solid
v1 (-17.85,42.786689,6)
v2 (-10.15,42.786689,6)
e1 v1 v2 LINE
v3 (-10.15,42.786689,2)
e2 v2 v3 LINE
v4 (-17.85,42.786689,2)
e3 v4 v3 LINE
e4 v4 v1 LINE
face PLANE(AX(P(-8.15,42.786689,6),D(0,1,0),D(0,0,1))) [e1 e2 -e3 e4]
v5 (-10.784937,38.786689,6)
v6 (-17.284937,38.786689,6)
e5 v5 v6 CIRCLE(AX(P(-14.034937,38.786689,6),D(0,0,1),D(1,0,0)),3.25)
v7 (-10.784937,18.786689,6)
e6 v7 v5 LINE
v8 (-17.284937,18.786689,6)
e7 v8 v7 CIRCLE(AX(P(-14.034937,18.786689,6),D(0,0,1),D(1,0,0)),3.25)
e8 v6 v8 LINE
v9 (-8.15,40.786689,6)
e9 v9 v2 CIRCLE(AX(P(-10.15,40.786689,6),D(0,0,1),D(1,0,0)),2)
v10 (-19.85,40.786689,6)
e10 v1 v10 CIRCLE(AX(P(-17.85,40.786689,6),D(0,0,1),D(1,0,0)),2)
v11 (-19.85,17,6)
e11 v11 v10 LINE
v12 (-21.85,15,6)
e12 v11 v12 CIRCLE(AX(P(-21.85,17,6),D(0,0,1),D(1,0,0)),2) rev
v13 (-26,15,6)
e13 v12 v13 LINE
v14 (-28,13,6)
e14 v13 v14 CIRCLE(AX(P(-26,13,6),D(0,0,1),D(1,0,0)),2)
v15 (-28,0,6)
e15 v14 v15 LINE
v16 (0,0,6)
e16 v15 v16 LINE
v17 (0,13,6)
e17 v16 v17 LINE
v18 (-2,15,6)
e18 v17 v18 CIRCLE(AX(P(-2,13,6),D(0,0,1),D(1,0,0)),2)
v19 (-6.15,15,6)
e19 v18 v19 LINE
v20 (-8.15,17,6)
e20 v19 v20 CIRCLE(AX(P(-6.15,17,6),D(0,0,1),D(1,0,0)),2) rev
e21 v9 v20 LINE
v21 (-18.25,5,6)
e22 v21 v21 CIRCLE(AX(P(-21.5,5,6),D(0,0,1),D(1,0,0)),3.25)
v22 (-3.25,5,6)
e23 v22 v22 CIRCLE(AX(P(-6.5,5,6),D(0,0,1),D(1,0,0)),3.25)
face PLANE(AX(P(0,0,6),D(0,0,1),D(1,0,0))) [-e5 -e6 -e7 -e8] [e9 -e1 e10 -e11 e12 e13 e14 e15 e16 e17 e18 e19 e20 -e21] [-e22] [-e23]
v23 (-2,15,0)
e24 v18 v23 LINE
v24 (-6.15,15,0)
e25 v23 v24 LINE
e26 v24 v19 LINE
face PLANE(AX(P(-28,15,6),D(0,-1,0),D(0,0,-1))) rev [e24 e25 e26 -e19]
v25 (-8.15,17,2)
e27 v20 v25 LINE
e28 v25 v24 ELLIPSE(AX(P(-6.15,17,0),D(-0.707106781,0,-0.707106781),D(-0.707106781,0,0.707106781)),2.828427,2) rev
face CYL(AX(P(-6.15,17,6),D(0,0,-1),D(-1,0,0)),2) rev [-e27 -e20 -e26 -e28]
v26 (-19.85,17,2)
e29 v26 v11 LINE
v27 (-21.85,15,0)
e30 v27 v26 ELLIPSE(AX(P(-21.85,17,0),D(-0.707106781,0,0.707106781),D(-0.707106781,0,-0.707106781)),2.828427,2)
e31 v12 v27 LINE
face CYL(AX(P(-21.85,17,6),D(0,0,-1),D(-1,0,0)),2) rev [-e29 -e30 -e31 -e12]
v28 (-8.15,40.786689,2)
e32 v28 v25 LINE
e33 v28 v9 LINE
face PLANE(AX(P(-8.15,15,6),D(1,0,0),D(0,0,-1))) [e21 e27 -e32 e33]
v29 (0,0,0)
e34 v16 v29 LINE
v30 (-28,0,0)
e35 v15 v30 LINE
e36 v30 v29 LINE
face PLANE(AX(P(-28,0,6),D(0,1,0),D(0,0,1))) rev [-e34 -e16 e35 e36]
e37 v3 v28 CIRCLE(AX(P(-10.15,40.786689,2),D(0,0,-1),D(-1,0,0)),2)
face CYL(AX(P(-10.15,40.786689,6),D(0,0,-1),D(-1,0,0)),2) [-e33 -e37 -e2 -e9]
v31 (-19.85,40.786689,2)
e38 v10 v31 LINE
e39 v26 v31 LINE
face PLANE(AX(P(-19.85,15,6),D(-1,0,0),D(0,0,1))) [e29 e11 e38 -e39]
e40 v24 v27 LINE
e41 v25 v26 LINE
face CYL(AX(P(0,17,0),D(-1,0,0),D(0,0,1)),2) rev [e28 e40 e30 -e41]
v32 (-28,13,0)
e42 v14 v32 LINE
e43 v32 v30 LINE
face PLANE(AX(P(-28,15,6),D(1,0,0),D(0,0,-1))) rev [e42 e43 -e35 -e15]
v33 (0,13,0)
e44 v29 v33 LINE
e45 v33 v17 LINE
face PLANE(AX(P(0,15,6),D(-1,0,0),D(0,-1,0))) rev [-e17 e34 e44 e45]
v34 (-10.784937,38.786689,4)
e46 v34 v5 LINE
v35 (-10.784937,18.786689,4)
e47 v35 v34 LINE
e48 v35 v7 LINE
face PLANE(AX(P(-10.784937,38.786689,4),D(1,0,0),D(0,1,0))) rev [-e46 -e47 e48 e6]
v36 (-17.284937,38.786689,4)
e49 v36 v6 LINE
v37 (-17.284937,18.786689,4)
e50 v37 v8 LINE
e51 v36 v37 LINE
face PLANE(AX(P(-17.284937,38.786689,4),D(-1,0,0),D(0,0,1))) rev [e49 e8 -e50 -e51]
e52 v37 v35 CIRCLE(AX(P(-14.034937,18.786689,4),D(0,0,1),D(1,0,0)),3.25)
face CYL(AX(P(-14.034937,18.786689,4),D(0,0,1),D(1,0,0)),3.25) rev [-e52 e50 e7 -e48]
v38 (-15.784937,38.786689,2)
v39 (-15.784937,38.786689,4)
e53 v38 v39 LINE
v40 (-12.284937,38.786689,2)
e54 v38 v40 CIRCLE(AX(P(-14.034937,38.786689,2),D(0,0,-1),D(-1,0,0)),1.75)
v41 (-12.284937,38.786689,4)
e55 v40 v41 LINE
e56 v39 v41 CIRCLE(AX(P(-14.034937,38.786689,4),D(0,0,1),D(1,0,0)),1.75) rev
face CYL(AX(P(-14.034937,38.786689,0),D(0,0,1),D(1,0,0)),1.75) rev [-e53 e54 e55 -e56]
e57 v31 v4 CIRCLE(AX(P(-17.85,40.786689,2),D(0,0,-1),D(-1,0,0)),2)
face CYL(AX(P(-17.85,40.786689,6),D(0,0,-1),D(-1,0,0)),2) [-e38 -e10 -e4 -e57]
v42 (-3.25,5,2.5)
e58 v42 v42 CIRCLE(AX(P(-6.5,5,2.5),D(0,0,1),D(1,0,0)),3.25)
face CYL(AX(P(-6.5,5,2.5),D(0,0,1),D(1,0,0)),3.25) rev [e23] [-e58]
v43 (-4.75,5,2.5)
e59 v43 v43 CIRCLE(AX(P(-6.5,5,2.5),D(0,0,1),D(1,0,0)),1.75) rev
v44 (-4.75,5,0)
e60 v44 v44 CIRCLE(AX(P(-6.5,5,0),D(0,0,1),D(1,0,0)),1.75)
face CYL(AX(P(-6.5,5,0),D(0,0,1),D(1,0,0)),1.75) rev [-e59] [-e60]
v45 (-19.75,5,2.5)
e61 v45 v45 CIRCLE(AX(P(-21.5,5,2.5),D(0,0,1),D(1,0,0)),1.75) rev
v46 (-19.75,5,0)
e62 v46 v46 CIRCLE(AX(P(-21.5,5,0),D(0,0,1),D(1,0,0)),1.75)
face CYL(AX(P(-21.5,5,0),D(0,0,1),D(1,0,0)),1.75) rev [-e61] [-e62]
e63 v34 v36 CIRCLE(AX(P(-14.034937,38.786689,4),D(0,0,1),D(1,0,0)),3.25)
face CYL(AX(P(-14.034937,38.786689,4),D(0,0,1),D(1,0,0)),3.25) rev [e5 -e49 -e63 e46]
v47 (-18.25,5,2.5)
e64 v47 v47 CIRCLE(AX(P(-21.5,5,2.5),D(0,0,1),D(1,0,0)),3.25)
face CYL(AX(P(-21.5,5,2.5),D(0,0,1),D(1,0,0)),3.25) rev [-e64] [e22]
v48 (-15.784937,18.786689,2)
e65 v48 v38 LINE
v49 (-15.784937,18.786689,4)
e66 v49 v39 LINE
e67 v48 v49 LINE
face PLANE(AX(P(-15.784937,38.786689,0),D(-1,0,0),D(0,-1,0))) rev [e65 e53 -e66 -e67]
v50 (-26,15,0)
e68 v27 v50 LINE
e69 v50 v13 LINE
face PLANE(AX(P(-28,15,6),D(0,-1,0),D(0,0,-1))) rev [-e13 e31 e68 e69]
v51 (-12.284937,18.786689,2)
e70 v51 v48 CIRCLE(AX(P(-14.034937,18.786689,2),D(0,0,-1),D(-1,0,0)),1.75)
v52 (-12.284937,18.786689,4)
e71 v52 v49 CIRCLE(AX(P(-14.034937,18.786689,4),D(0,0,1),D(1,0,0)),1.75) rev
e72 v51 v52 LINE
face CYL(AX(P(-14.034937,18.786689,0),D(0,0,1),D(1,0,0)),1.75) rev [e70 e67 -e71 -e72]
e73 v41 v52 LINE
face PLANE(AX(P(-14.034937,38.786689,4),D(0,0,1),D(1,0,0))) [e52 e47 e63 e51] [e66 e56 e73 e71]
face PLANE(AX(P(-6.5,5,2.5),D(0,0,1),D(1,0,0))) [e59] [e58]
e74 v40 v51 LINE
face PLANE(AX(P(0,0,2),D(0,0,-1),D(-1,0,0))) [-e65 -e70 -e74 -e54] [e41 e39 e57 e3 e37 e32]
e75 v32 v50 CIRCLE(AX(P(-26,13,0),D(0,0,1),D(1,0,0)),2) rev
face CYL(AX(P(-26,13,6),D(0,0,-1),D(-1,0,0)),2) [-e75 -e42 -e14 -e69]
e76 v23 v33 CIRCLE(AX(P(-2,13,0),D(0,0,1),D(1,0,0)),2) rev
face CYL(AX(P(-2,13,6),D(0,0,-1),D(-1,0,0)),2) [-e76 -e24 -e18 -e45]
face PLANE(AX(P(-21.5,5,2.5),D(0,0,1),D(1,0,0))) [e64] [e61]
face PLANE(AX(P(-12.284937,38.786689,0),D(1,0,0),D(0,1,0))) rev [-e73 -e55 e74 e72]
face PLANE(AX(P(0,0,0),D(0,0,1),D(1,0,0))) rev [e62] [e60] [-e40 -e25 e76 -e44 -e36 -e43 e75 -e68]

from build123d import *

# Parameters (mm, degrees)
BOSS_EXTRUDE1_DEPTH     = 6
CUT_EXTRUDE1_DEPTH      = 33.32645975048922
CUT_EXTRUDE1_DEPTH_BACK = 33.32645975048922
SKETCH3_R               = 1.7500000000000002
SKETCH3_R_2             = 1.7499999999999998
SKETCH6_R               = 3.2500000000000004
SKETCH6_R_2             = 3.25
CUT_EXTRUDE2_DEPTH      = 3.5
SKETCH7_W               = 11.699999999999998
SKETCH7_H               = 27.786688839798195
BOSS_EXTRUDE2_DEPTH     = 6
SKETCH8_W               = 11.699999999999998
SKETCH8_H               = 27.786688839798195
CUT_EXTRUDE3_DEPTH      = 2
FILLET1_R               = 2
FILLET2_R               = 2
FILLET3_R               = 2
CUT_EXTRUDE4_DEPTH      = 52.48495646180262
CUT_EXTRUDE4_DEPTH_BACK = 52.48495646180262
CUT_EXTRUDE5_DEPTH      = 52.48495646180262
CUT_EXTRUDE5_DEPTH_BACK = 2
FILLET4_R               = 2
FILLET5_R               = 2


with BuildPart() as part:
    # Sketch2 → Boss-Extrude1 (new body)
    with BuildSketch(Plane.XY):
        Polygon((-27.999999999999996, 15), (1.84e-15, 15), (0, 0), (-27.999999999999996, 0), align=None)
    extrude(amount=BOSS_EXTRUDE1_DEPTH)

    # Sketch3 → Cut-Extrude1 (cut, two sides: drawn at the far end of the back side and taken through both)
    with BuildSketch(Plane.XY.offset(6).offset(-CUT_EXTRUDE1_DEPTH_BACK)):
        with Locations((-21.5, 4.999999999999999)):
            Circle(SKETCH3_R)
        with Locations((-6.5, 4.999999999999999)):
            Circle(SKETCH3_R_2)
    extrude(amount=CUT_EXTRUDE1_DEPTH + CUT_EXTRUDE1_DEPTH_BACK, mode=Mode.SUBTRACT)

    # Sketch6 → Cut-Extrude2 (cut)
    with BuildSketch(Plane.XY.offset(6)):
        with Locations((-21.5, 4.999999999999999)):
            Circle(SKETCH6_R)
        with Locations((-6.500000000000001, 4.999999999999999)):
            Circle(SKETCH6_R_2)
    extrude(amount=-CUT_EXTRUDE2_DEPTH, mode=Mode.SUBTRACT)

    # Sketch7 → Boss-Extrude2 (add)
    with BuildSketch(Plane(origin=(0, 0, 0), x_dir=(-1, 0, 0), z_dir=(0, 0, -1))):
        with Locations((14, 28.893344419899098)):
            Rectangle(SKETCH7_W, SKETCH7_H)
    extrude(amount=-BOSS_EXTRUDE2_DEPTH)

    # Sketch8 → Cut-Extrude3 (cut)
    with BuildSketch(Plane(origin=(0, 0, 0), x_dir=(-1, 0, 0), z_dir=(0, 0, -1))):
        with Locations((14, 28.893344419899098)):
            Rectangle(SKETCH8_W, SKETCH8_H)
    extrude(amount=-CUT_EXTRUDE3_DEPTH, mode=Mode.SUBTRACT)

    # Fillet1
    fillet1_edges = [part.edges().sort_by_distance(p)[0] for p in [
        (-14, 15, 2),
    ]]
    fillet(fillet1_edges, radius=FILLET1_R - 0.0001)  # a hair under: the kernel refuses the full size

    # Fillet2
    fillet2_edges = [part.edges().sort_by_distance(p)[0] for p in [
        (-8.15, 15, 3.0000500000000003),
    ]]
    fillet(fillet2_edges, radius=FILLET2_R)

    # Fillet3
    fillet3_edges = [part.edges().sort_by_distance(p)[0] for p in [
        (-19.849999999999998, 15, 3.00005),
    ]]
    fillet(fillet3_edges, radius=FILLET3_R)

    # Sketch9 → Cut-Extrude4 (cut, two sides: drawn at the far end of the back side and taken through both)
    with BuildSketch(Plane.XY.offset(6).offset(-CUT_EXTRUDE4_DEPTH_BACK)):
        with BuildLine():
            Line((-12.28493666219322, 38.78668883979819), (-12.284936662193216, 18.786688839798188))
            ThreePointArc((-12.284936662193216, 18.786688839798188), (-14.034936662193216, 17.036688839798188), (-15.784936662193216, 18.786688839798188))
            Line((-15.784936662193216, 18.786688839798188), (-15.78493666219322, 38.78668883979819))
            ThreePointArc((-15.78493666219322, 38.78668883979819), (-14.03493666219322, 40.53668883979819), (-12.28493666219322, 38.78668883979819))
        make_face()
    extrude(amount=CUT_EXTRUDE4_DEPTH + CUT_EXTRUDE4_DEPTH_BACK, mode=Mode.SUBTRACT)

    # Sketch10 → Cut-Extrude5 (cut, two sides: drawn at the far end of the back side and taken through both)
    with BuildSketch(Plane.XY.offset(6).offset(-CUT_EXTRUDE5_DEPTH_BACK)):
        with BuildLine():
            Line((-10.784936662193223, 38.78668883979819), (-10.78493666219322, 18.786688839798188))
            ThreePointArc((-10.78493666219322, 18.786688839798188), (-14.034936662193216, 15.536688839798186), (-17.284936662193218, 18.786688839798188))
            Line((-17.284936662193218, 18.786688839798188), (-17.284936662193218, 38.78668883979819))
            ThreePointArc((-17.284936662193218, 38.78668883979819), (-14.03493666219322, 42.03668883979819), (-10.784936662193223, 38.78668883979819))
        make_face()
    extrude(amount=CUT_EXTRUDE5_DEPTH + CUT_EXTRUDE5_DEPTH_BACK, mode=Mode.SUBTRACT)

    # Fillet4
    fillet4_edges = [part.edges().sort_by_distance(p)[0] for p in [
        (-8.15, 42.786688839798195, 4),
        (-19.849999999999998, 42.786688839798195, 4),
    ]]
    fillet(fillet4_edges, radius=FILLET4_R)

    # Fillet5
    fillet5_edges = [part.edges().sort_by_distance(p)[0] for p in [
        (-27.999999999999996, 15, 3),
        (1.84e-15, 15, 3),
    ]]
    fillet(fillet5_edges, radius=FILLET5_R)


solid = part.part
